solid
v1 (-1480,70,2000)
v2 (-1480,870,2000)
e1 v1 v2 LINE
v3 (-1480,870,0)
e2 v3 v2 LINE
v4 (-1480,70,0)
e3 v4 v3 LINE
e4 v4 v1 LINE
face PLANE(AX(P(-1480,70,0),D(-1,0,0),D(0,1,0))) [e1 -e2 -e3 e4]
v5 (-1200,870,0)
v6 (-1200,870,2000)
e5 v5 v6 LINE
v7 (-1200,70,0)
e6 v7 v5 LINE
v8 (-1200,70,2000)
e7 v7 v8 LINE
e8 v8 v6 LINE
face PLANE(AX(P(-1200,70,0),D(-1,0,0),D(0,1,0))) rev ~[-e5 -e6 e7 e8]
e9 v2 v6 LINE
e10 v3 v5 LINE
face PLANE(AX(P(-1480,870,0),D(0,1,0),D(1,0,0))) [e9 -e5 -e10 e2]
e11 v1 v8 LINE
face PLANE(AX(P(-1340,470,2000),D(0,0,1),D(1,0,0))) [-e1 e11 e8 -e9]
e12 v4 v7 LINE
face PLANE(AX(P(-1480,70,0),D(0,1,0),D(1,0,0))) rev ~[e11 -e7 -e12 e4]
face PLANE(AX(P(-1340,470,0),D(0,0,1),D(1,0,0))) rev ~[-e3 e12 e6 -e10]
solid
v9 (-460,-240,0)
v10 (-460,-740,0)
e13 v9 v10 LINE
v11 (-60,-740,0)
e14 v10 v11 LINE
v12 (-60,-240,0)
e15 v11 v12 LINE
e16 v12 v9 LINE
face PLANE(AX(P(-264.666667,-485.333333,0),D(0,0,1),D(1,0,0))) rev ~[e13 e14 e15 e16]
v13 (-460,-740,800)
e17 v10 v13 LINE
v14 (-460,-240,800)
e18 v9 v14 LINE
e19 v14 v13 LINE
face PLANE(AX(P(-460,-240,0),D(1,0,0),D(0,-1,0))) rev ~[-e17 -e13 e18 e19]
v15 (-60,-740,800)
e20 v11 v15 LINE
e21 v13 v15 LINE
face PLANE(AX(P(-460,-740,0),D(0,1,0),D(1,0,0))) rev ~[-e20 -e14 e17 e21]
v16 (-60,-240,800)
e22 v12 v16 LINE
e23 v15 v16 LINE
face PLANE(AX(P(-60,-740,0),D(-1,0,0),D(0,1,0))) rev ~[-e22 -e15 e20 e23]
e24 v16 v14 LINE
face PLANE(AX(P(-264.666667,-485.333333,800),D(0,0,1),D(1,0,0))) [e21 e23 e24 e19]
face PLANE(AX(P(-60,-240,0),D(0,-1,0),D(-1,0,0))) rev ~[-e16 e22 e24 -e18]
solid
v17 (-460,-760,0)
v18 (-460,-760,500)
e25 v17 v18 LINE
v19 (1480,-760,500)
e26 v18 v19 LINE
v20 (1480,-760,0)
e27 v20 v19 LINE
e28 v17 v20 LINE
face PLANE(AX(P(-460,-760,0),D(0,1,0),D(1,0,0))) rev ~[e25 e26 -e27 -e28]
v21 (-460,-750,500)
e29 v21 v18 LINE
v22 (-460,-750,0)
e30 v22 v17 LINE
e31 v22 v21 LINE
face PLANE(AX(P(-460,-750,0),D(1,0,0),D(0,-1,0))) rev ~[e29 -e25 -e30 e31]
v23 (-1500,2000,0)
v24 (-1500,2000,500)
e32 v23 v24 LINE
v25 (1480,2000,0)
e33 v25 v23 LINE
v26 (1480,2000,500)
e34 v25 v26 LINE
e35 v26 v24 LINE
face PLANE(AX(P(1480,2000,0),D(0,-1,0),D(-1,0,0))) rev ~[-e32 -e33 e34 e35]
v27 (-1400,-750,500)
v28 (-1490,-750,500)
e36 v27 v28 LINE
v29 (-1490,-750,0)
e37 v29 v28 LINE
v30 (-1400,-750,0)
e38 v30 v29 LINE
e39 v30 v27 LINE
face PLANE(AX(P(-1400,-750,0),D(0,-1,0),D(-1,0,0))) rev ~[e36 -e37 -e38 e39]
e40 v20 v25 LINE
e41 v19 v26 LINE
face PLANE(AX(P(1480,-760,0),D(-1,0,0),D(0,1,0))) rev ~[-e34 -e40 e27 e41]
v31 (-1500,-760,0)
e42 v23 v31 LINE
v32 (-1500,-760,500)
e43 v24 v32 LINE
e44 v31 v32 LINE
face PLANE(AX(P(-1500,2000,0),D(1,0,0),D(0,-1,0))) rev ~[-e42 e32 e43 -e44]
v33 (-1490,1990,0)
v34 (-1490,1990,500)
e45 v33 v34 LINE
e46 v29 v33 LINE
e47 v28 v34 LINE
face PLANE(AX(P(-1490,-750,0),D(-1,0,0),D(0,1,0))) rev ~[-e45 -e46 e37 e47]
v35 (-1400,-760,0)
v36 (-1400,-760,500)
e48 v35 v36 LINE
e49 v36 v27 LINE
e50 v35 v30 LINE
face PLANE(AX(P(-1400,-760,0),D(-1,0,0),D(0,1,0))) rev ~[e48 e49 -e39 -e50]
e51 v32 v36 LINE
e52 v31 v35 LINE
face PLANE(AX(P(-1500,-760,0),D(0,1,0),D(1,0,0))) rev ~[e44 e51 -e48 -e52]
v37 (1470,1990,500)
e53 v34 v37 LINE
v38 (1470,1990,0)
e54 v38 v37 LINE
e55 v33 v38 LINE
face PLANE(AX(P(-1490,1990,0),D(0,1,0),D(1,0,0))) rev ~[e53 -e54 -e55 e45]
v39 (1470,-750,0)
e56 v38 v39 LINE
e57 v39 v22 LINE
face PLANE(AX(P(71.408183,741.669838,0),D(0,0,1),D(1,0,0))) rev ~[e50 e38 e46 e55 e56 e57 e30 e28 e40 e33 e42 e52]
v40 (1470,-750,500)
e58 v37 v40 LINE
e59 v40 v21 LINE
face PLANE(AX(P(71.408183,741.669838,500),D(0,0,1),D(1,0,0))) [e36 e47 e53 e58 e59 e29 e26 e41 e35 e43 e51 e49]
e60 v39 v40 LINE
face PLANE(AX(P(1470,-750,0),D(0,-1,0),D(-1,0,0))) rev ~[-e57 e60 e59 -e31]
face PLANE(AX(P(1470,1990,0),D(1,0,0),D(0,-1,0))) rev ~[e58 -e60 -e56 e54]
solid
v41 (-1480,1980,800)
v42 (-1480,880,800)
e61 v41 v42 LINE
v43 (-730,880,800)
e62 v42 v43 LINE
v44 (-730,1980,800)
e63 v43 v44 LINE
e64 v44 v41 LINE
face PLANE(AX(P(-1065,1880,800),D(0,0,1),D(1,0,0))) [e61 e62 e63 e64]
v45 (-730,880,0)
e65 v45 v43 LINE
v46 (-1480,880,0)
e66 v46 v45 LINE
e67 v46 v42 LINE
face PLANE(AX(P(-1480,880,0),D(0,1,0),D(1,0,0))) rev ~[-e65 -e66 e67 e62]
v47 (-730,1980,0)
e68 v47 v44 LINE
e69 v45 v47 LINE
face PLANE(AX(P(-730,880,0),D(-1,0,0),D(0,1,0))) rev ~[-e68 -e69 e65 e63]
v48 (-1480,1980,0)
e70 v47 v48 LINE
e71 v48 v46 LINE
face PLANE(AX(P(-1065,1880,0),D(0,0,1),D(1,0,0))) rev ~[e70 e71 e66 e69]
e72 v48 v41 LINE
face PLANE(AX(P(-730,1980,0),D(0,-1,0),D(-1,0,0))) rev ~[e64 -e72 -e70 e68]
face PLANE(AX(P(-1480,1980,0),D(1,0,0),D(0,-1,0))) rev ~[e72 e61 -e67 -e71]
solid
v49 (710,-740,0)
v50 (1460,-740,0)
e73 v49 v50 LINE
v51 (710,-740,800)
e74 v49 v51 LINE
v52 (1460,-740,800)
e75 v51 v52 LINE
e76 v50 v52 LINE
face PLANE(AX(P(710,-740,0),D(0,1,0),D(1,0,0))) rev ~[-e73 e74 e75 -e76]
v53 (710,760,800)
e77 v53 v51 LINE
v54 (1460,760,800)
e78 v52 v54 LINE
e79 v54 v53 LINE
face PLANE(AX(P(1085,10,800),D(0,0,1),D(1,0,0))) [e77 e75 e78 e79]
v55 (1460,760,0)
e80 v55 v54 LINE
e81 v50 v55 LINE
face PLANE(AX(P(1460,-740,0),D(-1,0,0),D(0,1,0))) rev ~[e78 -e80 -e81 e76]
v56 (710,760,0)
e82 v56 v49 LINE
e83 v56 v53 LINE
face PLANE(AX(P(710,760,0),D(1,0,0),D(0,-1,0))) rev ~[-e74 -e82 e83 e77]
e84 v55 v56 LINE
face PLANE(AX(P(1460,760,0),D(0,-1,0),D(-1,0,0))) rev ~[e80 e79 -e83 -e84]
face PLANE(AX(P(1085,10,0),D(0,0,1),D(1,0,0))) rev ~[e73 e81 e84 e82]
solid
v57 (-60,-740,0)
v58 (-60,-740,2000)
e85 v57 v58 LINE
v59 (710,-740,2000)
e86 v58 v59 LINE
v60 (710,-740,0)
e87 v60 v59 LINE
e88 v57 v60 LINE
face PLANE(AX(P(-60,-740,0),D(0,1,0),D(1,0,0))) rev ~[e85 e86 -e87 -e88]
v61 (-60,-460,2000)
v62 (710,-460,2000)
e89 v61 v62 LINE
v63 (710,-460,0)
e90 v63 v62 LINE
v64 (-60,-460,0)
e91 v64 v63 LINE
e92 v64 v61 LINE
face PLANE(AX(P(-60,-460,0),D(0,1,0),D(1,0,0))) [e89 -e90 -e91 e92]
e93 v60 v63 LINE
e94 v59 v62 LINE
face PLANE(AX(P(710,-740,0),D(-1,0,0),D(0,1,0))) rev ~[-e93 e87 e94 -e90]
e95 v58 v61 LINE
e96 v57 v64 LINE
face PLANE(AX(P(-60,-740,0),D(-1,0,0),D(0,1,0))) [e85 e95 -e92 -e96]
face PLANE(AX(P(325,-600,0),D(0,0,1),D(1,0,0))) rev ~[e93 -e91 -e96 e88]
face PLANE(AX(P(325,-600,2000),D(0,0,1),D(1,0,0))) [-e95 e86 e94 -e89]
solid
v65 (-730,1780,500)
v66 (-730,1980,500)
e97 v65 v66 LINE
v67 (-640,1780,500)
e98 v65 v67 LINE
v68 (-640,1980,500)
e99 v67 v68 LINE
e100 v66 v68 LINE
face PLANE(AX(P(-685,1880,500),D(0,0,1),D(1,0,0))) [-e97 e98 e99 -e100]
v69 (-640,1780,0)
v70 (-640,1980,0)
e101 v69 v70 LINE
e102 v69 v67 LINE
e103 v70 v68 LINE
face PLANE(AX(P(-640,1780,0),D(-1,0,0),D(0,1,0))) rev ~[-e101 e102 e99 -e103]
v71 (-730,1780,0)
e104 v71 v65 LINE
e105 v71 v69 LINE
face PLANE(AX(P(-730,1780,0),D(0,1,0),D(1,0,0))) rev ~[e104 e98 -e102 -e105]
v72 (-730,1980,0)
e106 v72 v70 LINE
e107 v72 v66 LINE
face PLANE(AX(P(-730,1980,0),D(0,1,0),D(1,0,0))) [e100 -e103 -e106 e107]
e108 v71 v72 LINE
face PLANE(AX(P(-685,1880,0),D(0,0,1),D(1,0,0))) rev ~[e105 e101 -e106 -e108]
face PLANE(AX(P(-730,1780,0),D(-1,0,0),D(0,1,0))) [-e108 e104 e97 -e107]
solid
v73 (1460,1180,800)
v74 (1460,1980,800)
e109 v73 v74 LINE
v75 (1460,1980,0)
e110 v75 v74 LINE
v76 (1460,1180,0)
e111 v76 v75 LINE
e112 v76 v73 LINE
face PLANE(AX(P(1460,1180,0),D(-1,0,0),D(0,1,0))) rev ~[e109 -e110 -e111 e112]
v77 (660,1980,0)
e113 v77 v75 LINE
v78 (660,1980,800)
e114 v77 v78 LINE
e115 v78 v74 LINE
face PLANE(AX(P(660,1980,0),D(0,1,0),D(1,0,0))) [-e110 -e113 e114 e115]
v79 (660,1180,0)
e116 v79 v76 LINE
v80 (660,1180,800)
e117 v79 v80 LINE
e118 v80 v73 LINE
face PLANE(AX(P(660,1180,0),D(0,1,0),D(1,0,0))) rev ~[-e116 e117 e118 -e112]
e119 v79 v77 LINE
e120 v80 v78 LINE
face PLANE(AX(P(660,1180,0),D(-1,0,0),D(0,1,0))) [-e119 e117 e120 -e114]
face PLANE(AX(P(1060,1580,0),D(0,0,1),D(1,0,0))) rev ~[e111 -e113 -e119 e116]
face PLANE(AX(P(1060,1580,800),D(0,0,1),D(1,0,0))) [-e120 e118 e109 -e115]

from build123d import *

# Parameters (mm, degrees)
F1_DEPTH = 500
F0_W     = 280
F0_H     = 800
F2_DEPTH = 2000
F0_W_2   = 90
F0_H_2   = 200
F3_DEPTH = 500
F0_W_3   = 670
F4_DEPTH = 800
F0_W_4   = 770
F0_H_3   = 280
F5_DEPTH = 2000
F6_DEPTH = 800
F0_W_5   = 800
F7_DEPTH = 800
F0_W_6   = 30
F8_DEPTH = 800


with BuildPart() as f1:
    # F0 (on Top) → F1 (new body)
    with BuildSketch(Plane.XY):
        Polygon((-1490, -750), (-1490, 1990), (1470, 1990), (1470, -750), (-460, -750), (-460, -760), (1480, -760), (1480, 2000), (-1500, 2000), (-1500, -760), (-1400, -760), (-1400, -750), align=None)
    extrude(amount=F1_DEPTH)


with BuildPart() as f2:
    # F0 (on Top) → F2 (new body)
    with BuildSketch(Plane.XY):
        with Locations((-1340, 470)):
            Rectangle(F0_W, F0_H)
    extrude(amount=F2_DEPTH)


with BuildPart() as f3:
    # F0 (on Top) → F3 (new body)
    with BuildSketch(Plane.XY):
        with Locations((-685, 1880)):
            Rectangle(F0_W_2, F0_H_2)
    extrude(amount=F3_DEPTH)


with BuildPart() as f4:
    # F0 (on Top) → F4 (new body)
    with BuildSketch(Plane.XY):
        with Locations((-1065, 1880)):
            Rectangle(F0_W_3, F0_H_2)
        Polygon((-1400, 1780), (-1400, 1980), (-1480, 1980), (-1480, 880), (-730, 880), (-730, 1780), align=None)
    extrude(amount=F4_DEPTH)


with BuildPart() as f5:
    # F0 (on Top) → F5 (new body)
    with BuildSketch(Plane.XY):
        with Locations((325, -600)):
            Rectangle(F0_W_4, F0_H_3)
    extrude(amount=F5_DEPTH)


with BuildPart() as f6:
    # F0 (on Top) → F6 (new body)
    with BuildSketch(Plane.XY):
        Polygon((1460, 760), (710, 760), (710, -460), (710, -740), (1460, -740), align=None)
    extrude(amount=F6_DEPTH)


with BuildPart() as f7:
    # F0 (on Top) → F7 (new body)
    with BuildSketch(Plane.XY):
        with Locations((1060, 1580)):
            Rectangle(F0_W_5, F0_H)
    extrude(amount=F7_DEPTH)


with BuildPart() as f8:
    # F0 (on Top) → F8 (new body)
    with BuildSketch(Plane.XY):
        Polygon((-90, -460), (-60, -460), (-60, -240), (-460, -240), (-460, -740), (-90, -740), align=None)
        with Locations((-75, -600)):
            Rectangle(F0_W_6, F0_H_3)
    extrude(amount=F8_DEPTH)


solid = Compound([f1.part, f2.part, f3.part, f4.part, f5.part, f6.part, f7.part, f8.part])
